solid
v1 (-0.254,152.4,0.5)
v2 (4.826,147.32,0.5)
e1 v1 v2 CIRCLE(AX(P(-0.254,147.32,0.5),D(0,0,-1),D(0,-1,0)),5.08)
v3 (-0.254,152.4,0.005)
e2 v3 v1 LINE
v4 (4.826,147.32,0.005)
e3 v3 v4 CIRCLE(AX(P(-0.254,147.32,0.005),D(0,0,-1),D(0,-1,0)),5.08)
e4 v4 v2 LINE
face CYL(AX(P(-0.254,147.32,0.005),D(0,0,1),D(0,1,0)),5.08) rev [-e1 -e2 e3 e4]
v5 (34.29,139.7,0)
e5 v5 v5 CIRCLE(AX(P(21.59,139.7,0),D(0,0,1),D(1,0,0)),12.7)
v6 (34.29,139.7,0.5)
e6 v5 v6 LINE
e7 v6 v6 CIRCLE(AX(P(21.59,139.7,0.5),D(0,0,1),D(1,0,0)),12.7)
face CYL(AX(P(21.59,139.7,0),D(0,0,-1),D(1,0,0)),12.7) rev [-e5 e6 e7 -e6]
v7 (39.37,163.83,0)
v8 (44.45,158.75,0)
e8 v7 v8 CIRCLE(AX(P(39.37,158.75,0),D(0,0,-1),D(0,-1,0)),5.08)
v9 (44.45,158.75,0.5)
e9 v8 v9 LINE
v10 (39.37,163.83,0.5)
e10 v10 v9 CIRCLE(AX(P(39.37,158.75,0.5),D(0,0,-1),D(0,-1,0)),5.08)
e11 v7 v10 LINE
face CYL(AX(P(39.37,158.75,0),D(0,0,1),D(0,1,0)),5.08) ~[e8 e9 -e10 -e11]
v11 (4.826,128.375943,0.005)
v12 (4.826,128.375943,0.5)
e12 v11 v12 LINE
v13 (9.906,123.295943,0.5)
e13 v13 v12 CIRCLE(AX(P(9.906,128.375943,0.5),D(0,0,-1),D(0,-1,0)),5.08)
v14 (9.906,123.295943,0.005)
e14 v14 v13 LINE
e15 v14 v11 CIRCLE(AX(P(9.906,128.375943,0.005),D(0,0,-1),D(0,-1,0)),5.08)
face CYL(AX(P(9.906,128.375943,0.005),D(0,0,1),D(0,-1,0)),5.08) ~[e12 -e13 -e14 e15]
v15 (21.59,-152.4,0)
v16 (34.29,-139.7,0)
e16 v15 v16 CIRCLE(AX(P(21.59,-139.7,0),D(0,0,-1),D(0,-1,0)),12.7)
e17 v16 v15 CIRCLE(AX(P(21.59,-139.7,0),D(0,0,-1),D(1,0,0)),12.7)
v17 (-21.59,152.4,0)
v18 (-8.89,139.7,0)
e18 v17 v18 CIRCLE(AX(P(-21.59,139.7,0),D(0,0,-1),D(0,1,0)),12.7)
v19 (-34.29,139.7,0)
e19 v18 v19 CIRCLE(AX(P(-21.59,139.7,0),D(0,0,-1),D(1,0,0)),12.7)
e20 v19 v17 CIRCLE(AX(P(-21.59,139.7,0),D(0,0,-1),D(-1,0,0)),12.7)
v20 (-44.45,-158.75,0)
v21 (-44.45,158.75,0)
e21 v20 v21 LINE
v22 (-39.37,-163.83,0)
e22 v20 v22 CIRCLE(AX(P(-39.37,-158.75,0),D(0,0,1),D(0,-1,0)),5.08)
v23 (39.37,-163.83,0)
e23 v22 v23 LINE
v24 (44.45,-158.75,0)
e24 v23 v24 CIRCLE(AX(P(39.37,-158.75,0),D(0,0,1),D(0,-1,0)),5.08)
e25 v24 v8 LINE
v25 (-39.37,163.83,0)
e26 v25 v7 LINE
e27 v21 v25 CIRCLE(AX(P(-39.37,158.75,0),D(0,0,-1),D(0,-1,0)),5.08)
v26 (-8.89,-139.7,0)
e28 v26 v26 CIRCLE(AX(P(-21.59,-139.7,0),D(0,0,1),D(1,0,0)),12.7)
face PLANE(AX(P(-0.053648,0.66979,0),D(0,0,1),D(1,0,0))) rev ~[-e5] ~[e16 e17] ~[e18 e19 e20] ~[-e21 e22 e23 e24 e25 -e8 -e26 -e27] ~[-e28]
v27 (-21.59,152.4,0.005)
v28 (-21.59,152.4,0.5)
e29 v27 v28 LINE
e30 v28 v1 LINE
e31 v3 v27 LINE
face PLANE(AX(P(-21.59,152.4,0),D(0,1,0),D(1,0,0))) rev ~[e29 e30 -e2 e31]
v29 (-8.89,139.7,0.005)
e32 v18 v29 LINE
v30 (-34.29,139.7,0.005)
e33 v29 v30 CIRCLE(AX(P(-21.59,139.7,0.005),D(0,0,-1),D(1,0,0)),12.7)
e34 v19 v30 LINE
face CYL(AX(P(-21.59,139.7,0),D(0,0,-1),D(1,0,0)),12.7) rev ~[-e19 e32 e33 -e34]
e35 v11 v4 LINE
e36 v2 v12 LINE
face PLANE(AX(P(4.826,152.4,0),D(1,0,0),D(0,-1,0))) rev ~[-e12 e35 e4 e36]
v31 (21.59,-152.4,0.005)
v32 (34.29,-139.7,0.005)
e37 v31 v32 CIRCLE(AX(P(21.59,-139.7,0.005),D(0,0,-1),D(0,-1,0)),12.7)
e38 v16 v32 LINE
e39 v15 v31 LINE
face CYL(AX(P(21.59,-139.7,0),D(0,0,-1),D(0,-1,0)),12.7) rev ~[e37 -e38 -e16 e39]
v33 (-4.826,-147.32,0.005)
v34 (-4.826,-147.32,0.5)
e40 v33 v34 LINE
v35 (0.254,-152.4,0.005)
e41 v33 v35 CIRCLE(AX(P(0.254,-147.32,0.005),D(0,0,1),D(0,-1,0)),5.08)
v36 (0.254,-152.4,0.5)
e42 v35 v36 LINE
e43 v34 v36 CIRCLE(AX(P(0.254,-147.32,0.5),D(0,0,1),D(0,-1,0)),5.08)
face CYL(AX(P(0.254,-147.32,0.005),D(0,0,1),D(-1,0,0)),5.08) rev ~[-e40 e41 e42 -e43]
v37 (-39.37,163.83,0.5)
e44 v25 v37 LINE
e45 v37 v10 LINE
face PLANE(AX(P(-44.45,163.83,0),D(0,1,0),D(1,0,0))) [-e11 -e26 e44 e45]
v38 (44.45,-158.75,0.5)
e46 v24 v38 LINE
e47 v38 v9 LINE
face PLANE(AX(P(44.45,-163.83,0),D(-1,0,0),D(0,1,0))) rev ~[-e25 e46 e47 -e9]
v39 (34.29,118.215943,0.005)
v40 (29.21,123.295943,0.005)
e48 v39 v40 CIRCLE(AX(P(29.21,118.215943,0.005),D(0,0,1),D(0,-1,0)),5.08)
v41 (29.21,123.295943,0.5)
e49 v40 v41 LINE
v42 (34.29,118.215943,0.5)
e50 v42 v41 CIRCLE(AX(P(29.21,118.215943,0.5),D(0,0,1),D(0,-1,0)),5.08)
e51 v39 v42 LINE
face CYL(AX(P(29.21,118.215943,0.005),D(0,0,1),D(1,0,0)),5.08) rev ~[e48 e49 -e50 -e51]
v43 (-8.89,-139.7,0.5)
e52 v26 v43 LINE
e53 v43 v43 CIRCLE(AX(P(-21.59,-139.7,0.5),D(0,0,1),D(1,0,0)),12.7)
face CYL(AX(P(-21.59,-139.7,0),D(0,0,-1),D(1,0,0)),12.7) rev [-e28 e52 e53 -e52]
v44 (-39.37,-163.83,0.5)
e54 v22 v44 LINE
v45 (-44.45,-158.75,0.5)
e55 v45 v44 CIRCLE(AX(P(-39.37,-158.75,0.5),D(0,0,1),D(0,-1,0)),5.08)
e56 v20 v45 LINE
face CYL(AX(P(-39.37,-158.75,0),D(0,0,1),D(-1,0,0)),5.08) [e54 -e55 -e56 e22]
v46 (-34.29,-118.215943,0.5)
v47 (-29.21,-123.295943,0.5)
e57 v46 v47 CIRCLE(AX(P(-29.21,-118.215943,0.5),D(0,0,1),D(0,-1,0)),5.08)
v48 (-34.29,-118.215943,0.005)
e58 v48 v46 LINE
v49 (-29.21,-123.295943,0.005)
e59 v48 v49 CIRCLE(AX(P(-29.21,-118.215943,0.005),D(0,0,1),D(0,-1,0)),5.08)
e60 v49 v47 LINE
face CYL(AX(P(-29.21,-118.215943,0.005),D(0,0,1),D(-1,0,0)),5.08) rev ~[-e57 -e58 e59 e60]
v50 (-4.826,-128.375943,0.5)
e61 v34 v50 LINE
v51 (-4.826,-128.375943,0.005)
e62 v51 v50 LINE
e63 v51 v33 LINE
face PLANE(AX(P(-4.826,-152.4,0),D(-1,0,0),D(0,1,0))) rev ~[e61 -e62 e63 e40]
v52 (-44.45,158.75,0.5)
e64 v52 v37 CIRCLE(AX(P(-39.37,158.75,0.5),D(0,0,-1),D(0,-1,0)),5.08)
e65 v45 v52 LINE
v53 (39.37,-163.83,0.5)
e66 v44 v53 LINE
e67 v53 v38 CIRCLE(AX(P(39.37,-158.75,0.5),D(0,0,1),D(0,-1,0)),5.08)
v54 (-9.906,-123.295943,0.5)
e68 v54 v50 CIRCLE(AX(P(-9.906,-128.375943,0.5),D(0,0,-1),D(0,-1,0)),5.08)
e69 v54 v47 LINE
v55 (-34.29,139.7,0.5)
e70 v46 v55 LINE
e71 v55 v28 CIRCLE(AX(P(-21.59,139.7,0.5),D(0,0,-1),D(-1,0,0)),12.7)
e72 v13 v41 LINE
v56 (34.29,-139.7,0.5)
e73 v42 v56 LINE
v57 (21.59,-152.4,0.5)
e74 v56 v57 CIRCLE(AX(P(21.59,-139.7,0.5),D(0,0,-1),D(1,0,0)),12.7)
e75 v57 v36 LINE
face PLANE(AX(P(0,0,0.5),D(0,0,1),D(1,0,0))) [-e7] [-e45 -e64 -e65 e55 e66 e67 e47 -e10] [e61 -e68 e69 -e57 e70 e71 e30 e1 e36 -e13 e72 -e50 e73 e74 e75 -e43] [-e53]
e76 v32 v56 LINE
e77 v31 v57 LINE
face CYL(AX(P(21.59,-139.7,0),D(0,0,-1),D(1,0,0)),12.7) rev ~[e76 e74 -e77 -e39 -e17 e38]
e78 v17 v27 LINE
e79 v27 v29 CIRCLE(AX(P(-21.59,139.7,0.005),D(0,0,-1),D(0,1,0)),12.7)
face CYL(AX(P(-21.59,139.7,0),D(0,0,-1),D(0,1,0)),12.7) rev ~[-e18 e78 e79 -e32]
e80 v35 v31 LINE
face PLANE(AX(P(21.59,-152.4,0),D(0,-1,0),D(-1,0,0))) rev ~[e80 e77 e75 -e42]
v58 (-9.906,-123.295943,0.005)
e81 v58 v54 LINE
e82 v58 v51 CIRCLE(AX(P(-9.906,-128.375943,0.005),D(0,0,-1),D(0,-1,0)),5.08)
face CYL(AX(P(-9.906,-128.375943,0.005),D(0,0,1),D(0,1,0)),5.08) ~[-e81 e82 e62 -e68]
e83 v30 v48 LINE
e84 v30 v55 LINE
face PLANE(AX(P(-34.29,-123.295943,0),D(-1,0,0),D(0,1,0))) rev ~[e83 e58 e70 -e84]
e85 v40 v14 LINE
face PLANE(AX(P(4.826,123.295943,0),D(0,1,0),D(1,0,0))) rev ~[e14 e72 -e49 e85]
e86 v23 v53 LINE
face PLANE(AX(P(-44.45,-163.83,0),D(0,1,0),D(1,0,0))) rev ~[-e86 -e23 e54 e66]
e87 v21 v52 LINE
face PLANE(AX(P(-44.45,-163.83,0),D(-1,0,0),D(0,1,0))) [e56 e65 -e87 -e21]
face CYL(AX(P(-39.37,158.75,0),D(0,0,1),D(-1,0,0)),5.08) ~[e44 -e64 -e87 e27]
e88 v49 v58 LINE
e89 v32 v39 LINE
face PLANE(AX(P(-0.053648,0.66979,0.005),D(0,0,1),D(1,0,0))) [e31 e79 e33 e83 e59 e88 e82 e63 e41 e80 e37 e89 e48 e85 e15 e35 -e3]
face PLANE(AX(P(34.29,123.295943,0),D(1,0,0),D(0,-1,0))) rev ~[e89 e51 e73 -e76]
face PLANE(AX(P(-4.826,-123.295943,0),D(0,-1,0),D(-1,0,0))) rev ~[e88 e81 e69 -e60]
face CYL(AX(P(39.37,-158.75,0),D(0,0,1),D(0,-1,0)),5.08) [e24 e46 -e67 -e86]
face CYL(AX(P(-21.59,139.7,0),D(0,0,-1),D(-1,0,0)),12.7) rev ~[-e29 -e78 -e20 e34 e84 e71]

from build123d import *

# Parameters (mm, degrees)
F0_W     = 88.9
F0_H     = 327.66
F0_R     = 12.7
F1_DEPTH = 0.5
F2_DEPTH = 0.005
F3_R     = 5.08


# Not quite as in the source:
# - a feature names something its author has since deleted; it is built from what else it names


with BuildPart() as f1:
    # F0 (on Top) → F1 (new body)
    with BuildSketch(Plane.XY):
        Rectangle(F0_W, F0_H)
        with Locations((-21.59, -139.7)):
            Circle(F0_R, mode=Mode.SUBTRACT)
        with BuildLine():
            ThreePointArc((-34.29, 139.7), (-30.5702561211, 148.6802561211), (-21.59, 152.4))
            Line((-21.59, 152.4), (4.826, 152.4))
            Line((4.826, 152.4), (4.826, 123.2959434))
            Line((4.826, 123.2959434), (34.29, 123.2959434))
            Line((34.29, 123.2959434), (34.29, -139.7))
            ThreePointArc((34.29, -139.7), (30.5702561211, -148.6802561211), (21.59, -152.4))
            Line((21.59, -152.4), (-4.826, -152.4))
            Line((-4.826, -152.4), (-4.826, -123.2959434))
            Line((-4.826, -123.2959434), (-34.29, -123.2959434))
            Line((-34.29, -123.2959434), (-34.29, 139.7))
        make_face(mode=Mode.SUBTRACT)
        with Locations((21.59, 139.7)):
            Circle(F0_R, mode=Mode.SUBTRACT)
    extrude(amount=F1_DEPTH)

    # F0 (on Top) → F2 (join)
    with BuildSketch(Plane.XY):
        with BuildLine():
            ThreePointArc((-21.59, 152.4), (-12.6097438789, 148.6802561211), (-8.89, 139.7))
            ThreePointArc((-8.89, 139.7), (-21.59, 127), (-34.29, 139.7))
            Line((-34.29, 139.7), (-34.29, -123.2959434))
            Line((-34.29, -123.2959434), (-4.826, -123.2959434))
            Line((-4.826, -123.2959434), (-4.826, -152.4))
            Line((-4.826, -152.4), (21.59, -152.4))
            ThreePointArc((21.59, -152.4), (12.6097438789, -130.7197438789), (34.29, -139.7))
            Line((34.29, -139.7), (34.29, 123.2959434))
            Line((34.29, 123.2959434), (4.826, 123.2959434))
            Line((4.826, 123.2959434), (4.826, 152.4))
            Line((4.826, 152.4), (-21.59, 152.4))
        make_face()
    extrude(amount=F2_DEPTH)

    # F3
    f3_edges = [f1.edges().sort_by_distance(p)[0] for p in [
        (-44.45, 163.83, 0.25),
        (44.45, -163.83, 0.25),
        (-44.45, -163.83, 0.25),
        (44.45, 163.83, 0.25),
        (4.826, 152.4, 0.2525),
        (4.826, 123.295943, 0.2525),
        (34.29, 123.295943, 0.2525),
        (-4.826, -152.4, 0.2525),
        (-4.826, -123.295943, 0.2525),
        (-34.29, -123.295943, 0.2525),
    ]]
    fillet(f3_edges, radius=F3_R)


solid = f1.part
